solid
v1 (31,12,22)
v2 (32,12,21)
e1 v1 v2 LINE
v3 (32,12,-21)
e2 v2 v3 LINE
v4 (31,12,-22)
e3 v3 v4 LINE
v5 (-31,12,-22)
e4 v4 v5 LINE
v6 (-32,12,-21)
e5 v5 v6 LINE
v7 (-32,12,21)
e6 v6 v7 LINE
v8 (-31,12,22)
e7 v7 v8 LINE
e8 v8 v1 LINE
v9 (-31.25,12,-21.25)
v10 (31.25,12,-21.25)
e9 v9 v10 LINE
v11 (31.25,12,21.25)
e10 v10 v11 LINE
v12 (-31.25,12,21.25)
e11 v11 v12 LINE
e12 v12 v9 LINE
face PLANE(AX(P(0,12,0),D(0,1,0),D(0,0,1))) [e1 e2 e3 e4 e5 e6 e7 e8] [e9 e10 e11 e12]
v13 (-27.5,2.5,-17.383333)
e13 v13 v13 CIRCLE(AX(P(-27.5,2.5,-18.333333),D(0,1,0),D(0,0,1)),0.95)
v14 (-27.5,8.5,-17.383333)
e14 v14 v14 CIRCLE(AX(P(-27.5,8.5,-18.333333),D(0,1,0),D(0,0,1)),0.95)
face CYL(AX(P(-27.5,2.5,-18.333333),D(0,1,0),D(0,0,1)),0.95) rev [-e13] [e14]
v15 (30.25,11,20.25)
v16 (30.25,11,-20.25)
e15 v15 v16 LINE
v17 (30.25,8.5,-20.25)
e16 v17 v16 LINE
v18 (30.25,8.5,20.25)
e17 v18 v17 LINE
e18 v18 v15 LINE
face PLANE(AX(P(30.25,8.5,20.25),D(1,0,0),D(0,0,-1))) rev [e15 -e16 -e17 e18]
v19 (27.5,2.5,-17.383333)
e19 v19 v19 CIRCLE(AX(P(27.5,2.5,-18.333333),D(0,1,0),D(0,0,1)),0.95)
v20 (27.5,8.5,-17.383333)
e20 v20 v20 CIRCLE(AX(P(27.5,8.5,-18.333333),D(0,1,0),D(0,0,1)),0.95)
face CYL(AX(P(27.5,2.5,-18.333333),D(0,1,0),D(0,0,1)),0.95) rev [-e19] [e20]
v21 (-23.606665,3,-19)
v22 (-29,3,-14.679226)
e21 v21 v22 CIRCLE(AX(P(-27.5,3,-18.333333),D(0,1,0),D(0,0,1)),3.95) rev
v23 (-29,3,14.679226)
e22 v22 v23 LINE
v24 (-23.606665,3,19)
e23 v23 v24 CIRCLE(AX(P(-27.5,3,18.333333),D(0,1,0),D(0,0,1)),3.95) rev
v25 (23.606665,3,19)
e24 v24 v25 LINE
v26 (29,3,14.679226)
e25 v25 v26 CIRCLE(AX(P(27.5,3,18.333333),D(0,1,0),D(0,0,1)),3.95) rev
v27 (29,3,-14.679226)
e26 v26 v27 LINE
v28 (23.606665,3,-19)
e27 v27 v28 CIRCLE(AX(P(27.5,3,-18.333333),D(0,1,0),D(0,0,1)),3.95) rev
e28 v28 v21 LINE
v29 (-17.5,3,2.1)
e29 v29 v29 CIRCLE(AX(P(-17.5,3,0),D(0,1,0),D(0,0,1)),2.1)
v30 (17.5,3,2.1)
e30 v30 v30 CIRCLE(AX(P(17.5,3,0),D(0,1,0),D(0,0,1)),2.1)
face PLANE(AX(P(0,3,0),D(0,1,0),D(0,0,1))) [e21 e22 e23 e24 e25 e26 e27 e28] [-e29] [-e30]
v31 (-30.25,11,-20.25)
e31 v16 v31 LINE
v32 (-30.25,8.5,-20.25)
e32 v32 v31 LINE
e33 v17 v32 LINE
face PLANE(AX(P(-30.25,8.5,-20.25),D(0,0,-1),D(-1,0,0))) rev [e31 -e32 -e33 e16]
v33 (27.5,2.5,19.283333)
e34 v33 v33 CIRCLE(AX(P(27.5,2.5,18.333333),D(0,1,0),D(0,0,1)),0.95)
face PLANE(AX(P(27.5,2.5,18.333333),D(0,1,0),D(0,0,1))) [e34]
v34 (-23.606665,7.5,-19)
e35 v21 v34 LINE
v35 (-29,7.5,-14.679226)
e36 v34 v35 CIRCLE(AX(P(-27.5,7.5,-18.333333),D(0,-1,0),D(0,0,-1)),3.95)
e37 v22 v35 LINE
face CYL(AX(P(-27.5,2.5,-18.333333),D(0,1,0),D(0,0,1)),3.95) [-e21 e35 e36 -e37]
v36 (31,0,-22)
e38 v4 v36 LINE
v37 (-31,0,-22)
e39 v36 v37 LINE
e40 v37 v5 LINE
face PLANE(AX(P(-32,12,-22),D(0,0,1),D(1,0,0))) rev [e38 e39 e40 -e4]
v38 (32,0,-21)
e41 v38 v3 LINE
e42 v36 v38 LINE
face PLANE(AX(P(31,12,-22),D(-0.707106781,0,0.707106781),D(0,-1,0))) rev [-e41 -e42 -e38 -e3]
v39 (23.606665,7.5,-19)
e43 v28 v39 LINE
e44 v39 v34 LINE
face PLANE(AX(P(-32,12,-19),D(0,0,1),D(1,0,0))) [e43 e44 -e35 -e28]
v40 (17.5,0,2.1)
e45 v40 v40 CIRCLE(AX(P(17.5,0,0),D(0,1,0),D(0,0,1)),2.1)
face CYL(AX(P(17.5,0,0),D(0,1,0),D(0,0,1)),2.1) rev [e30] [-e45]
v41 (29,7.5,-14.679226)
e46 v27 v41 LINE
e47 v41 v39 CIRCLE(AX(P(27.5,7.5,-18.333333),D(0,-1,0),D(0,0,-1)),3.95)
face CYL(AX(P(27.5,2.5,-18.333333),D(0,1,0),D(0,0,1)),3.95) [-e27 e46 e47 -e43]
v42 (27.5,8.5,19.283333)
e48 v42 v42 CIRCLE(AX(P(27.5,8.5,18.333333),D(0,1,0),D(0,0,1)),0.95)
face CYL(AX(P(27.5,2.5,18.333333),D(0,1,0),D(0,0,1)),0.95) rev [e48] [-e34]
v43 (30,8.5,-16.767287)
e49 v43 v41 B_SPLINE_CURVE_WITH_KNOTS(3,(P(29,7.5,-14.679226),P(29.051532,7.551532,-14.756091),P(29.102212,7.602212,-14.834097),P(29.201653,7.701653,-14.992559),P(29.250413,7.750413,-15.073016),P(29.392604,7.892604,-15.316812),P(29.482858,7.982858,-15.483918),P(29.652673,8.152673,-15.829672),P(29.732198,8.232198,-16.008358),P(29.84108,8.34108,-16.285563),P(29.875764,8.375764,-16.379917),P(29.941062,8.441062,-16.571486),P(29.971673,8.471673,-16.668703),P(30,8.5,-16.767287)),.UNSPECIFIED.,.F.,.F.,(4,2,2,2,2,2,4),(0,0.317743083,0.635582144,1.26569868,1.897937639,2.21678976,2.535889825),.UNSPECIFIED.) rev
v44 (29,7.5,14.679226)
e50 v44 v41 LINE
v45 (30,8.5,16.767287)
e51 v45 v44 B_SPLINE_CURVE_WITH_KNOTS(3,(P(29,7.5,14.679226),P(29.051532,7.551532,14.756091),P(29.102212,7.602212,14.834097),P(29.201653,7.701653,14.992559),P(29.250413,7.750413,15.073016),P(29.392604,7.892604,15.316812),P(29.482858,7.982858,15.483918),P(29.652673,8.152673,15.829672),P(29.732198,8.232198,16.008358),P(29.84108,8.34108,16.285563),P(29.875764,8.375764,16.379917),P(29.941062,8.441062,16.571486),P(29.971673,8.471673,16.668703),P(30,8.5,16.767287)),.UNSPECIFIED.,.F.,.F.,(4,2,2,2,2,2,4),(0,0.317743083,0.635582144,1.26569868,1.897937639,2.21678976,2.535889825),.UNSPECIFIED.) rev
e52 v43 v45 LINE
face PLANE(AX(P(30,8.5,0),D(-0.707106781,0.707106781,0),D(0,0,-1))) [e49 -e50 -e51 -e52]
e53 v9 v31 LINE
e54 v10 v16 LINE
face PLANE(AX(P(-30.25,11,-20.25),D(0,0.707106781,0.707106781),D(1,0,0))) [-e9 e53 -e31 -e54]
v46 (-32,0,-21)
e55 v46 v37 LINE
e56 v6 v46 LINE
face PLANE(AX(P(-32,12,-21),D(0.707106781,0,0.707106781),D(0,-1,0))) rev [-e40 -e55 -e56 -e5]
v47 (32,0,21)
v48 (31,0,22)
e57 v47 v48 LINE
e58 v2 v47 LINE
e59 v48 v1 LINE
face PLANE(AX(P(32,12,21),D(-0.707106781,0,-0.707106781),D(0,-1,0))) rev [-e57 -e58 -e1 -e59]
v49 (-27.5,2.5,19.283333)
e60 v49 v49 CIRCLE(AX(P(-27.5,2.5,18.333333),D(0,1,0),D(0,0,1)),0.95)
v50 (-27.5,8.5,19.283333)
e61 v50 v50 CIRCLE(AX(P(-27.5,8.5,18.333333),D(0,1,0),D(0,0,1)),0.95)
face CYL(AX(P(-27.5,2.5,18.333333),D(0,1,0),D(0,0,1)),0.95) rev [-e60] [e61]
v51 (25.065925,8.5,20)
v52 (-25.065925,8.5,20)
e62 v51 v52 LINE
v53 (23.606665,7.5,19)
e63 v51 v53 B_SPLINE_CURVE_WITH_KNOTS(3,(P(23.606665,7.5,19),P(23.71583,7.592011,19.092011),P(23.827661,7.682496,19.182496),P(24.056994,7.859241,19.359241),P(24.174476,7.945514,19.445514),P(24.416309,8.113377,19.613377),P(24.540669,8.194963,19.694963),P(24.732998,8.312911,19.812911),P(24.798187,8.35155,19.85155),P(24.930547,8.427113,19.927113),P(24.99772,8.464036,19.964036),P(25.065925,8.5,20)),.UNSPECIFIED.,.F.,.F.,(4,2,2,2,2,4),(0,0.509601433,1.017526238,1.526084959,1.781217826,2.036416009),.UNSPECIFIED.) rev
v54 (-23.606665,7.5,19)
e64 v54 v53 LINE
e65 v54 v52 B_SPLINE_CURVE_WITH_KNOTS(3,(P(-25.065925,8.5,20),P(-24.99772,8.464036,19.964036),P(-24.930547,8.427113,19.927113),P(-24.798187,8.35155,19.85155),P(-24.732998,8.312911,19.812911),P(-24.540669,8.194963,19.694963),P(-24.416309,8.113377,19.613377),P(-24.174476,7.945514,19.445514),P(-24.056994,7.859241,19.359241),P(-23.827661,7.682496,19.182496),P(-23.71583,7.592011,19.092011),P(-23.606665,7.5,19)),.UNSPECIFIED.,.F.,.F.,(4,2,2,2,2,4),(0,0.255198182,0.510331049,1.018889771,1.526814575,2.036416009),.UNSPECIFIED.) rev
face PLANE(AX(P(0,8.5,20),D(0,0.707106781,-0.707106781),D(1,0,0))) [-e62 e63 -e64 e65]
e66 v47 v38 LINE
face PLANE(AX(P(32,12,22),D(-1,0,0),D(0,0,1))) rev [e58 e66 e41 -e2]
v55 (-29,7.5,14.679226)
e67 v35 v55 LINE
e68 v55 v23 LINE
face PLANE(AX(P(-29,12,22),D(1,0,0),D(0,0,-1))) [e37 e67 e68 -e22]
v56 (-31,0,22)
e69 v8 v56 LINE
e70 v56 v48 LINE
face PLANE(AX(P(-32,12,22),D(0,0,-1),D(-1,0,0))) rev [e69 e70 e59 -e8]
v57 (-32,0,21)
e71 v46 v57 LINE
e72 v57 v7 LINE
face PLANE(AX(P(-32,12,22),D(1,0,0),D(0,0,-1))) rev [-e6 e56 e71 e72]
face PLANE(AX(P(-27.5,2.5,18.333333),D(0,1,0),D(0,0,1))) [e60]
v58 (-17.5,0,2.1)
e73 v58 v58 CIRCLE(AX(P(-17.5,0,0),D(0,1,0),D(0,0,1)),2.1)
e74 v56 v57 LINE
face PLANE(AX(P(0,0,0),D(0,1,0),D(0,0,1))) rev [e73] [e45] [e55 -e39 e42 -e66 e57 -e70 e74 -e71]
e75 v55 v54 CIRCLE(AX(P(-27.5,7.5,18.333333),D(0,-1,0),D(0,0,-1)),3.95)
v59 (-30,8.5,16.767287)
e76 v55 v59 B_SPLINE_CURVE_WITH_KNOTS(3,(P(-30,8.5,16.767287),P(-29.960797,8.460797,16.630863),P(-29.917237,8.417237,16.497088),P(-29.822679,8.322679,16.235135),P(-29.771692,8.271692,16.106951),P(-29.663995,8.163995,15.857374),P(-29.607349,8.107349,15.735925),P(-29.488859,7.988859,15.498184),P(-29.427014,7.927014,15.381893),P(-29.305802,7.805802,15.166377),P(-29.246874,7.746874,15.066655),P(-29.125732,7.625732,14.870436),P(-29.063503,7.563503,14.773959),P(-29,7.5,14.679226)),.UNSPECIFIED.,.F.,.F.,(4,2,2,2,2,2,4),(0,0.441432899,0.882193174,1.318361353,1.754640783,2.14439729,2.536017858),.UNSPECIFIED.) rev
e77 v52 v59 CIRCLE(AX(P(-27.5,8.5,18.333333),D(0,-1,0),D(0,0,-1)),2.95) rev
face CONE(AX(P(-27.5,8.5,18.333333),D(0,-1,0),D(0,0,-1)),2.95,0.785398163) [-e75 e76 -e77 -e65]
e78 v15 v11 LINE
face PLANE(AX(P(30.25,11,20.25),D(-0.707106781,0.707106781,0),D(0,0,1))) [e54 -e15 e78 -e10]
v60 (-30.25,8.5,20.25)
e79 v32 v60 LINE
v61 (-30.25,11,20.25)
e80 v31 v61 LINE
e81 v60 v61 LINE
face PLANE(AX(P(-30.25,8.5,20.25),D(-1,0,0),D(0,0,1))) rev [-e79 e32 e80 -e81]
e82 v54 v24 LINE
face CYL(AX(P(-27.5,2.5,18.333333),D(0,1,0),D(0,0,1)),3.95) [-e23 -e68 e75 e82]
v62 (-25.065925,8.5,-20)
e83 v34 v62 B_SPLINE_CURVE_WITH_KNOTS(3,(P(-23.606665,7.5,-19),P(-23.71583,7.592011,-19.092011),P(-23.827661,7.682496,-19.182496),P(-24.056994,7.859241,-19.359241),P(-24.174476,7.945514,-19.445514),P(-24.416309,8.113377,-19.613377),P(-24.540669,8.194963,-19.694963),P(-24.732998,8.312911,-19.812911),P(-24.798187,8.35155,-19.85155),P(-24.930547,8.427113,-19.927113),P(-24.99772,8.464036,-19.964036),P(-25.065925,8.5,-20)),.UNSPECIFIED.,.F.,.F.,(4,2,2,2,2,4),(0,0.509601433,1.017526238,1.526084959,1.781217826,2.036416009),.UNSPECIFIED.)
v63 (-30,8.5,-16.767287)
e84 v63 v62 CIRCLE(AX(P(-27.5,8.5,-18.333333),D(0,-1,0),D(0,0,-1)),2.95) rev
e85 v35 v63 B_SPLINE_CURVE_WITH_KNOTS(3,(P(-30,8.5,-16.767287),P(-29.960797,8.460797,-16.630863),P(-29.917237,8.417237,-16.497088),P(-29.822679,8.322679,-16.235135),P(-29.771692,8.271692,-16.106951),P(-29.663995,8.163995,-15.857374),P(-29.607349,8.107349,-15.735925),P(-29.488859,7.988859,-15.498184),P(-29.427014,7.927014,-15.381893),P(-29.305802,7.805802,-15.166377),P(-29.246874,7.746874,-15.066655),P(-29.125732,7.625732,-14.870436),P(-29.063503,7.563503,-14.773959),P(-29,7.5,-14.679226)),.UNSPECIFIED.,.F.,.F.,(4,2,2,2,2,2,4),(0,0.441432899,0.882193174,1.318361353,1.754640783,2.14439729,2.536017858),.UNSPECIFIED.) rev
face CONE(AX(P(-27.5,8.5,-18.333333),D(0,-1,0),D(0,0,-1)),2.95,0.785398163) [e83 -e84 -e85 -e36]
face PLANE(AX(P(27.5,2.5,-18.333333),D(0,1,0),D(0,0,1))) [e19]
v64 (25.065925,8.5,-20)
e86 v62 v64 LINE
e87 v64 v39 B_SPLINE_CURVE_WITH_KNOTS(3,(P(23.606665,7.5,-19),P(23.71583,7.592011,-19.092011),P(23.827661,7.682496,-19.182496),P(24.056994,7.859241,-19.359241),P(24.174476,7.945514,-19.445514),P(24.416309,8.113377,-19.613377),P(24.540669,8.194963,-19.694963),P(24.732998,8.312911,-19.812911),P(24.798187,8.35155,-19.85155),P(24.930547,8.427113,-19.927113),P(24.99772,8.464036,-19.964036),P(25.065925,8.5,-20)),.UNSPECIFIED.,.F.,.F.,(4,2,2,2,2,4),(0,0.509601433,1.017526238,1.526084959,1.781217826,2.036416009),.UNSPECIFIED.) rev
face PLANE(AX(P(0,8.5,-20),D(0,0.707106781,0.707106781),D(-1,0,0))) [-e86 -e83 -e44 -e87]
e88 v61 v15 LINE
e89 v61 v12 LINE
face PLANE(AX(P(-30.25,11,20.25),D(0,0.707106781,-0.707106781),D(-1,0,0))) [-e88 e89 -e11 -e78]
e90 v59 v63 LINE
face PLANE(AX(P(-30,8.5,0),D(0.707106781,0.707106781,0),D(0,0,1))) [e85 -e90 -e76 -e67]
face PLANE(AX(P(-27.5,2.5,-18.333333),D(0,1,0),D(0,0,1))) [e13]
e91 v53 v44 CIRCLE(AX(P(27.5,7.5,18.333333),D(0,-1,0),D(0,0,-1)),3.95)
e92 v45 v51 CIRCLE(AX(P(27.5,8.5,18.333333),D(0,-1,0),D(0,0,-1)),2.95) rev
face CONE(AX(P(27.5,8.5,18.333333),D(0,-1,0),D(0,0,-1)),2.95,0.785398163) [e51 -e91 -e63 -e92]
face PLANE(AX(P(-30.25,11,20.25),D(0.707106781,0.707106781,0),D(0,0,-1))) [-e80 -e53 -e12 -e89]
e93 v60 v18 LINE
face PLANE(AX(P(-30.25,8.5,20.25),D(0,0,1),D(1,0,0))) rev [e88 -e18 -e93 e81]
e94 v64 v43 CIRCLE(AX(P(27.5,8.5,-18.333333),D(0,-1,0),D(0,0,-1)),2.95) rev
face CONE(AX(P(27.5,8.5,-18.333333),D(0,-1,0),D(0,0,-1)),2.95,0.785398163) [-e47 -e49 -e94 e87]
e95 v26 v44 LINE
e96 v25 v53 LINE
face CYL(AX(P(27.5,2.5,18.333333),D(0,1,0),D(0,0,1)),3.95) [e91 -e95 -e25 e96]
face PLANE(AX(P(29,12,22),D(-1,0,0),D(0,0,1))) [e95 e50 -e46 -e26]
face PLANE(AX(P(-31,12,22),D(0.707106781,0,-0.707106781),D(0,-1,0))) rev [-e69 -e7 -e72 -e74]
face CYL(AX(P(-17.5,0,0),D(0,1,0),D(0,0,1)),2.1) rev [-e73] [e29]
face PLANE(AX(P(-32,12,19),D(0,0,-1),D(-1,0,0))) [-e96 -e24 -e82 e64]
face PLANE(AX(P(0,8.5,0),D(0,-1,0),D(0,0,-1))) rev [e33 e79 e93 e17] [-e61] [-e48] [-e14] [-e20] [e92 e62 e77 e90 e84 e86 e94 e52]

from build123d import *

# Parameters (mm, degrees)
SKETCH1_W           = 64
SKETCH1_H           = 44
BOSS_EXTRUDE1_DEPTH = 12
SKETCH2_W           = 60.5
SKETCH2_H           = 40.5
CUT_EXTRUDE1_DEPTH  = 3.5
SKETCH3_R           = 0.95
CUT_EXTRUDE2_DEPTH  = 6
SHELL1_START        = 3
SHELL1_DEPTH        = 5.5
CHAMFER1_SIZE       = 1
CHAMFER2_SIZE       = 1
CHAMFER3_SIZE       = 1
SKETCH4_R           = 2.1
CUT_EXTRUDE3_DEPTH  = 40.862262856


# Read off the part's stored shape, not the designer's step: Shell1
with BuildPart() as part:
    # Sketch1 → Boss-Extrude1 (new body)
    with BuildSketch(Plane(origin=(0, 0, 0), x_dir=(1, 0, 0), z_dir=(0, 1, 0))):
        Rectangle(SKETCH1_W, SKETCH1_H)
    extrude(amount=BOSS_EXTRUDE1_DEPTH)

    # Sketch2 → Cut-Extrude1 (cut)
    with BuildSketch(Plane(origin=(0, 12, 0), x_dir=(1, 0, 0), z_dir=(0, 1, 0))):
        Rectangle(SKETCH2_W, SKETCH2_H)
    extrude(amount=-CUT_EXTRUDE1_DEPTH, mode=Mode.SUBTRACT)

    # Sketch3 → Cut-Extrude2 (cut)
    with BuildSketch(Plane(origin=(0, 8.5, 0), x_dir=(1, 0, 0), z_dir=(0, 1, 0))):
        with Locations(Location((-27.5, 18.333333333, 0), (0, 0, 270))):
            Circle(SKETCH3_R)
        with Locations(Location((27.5, 18.333333333, 0), (0, 0, 270))):
            Circle(SKETCH3_R)
        with Locations(Location((27.5, -18.333333333, 0), (0, 0, 270))):
            Circle(SKETCH3_R)
        with Locations(Location((-27.5, -18.333333333, 0), (0, 0, 270))):
            Circle(SKETCH3_R)
    extrude(amount=-CUT_EXTRUDE2_DEPTH, mode=Mode.SUBTRACT)

    # Shell1 outline → Shell1 (cut)
    with BuildSketch(Plane(origin=(0, 0, 0), x_dir=(1, 0, 0), z_dir=(0, 1, 0)).offset(SHELL1_START)):
        with BuildLine():
            Line((-23.60666524, -19), (23.60666524, -19))
            ThreePointArc((23.60666524, -19), (25.030327008, -15.250604784), (29, -14.679226055))
            Line((29, -14.679226055), (29, 14.679226055))
            ThreePointArc((29, 14.679226055), (25.030327008, 15.250604784), (23.60666524, 19))
            Line((23.60666524, 19), (-23.60666524, 19))
            ThreePointArc((-23.60666524, 19), (-25.030327008, 15.250604784), (-29, 14.679226055))
            Line((-29, 14.679226055), (-29, -14.679226055))
            ThreePointArc((-29, -14.679226055), (-25.030327008, -15.250604784), (-23.60666524, -19))
        make_face()
    extrude(amount=SHELL1_DEPTH, mode=Mode.SUBTRACT)

    # Chamfer1
    chamfer1_edges = [part.edges().sort_by_distance(p)[0] for p in [
        (30.25, 12, 0),
        (0, 12, -20.25),
        (-30.25, 12, 0),
        (0, 12, 20.25),
    ]]
    chamfer(chamfer1_edges, length=CHAMFER1_SIZE)

    # Chamfer2
    chamfer2_edges = [part.edges().sort_by_distance(p)[0] for p in [
        (0, 8.5, 19),
        (29, 8.5, 0),
        (0, 8.5, -19),
        (-29, 8.5, 0),
        (-25.030327008, 8.5, -15.250604784),
        (25.030327008, 8.5, -15.250604784),
        (25.030327008, 8.5, 15.250604784),
        (-25.030327008, 8.5, 15.250604784),
    ]]
    chamfer(chamfer2_edges, length=CHAMFER2_SIZE)

    # Chamfer3
    chamfer3_edges = [part.edges().sort_by_distance(p)[0] for p in [
        (-32, 6, 22),
        (-32, 6, -22),
        (32, 6, -22),
        (32, 6, 22),
    ]]
    chamfer(chamfer3_edges, length=CHAMFER3_SIZE)

    # Sketch4 → Cut-Extrude3 (cut, through all)
    with BuildSketch(Plane(origin=(0, 3, 0), x_dir=(1, 0, 0), z_dir=(0, 1, 0))):
        with Locations(Location((-17.5, 0, 0), (0, 0, 270))):
            Circle(SKETCH4_R)
        with Locations(Location((17.5, 0, 0), (0, 0, 270))):
            Circle(SKETCH4_R)
    extrude(amount=-CUT_EXTRUDE3_DEPTH, mode=Mode.SUBTRACT)


solid = part.part
